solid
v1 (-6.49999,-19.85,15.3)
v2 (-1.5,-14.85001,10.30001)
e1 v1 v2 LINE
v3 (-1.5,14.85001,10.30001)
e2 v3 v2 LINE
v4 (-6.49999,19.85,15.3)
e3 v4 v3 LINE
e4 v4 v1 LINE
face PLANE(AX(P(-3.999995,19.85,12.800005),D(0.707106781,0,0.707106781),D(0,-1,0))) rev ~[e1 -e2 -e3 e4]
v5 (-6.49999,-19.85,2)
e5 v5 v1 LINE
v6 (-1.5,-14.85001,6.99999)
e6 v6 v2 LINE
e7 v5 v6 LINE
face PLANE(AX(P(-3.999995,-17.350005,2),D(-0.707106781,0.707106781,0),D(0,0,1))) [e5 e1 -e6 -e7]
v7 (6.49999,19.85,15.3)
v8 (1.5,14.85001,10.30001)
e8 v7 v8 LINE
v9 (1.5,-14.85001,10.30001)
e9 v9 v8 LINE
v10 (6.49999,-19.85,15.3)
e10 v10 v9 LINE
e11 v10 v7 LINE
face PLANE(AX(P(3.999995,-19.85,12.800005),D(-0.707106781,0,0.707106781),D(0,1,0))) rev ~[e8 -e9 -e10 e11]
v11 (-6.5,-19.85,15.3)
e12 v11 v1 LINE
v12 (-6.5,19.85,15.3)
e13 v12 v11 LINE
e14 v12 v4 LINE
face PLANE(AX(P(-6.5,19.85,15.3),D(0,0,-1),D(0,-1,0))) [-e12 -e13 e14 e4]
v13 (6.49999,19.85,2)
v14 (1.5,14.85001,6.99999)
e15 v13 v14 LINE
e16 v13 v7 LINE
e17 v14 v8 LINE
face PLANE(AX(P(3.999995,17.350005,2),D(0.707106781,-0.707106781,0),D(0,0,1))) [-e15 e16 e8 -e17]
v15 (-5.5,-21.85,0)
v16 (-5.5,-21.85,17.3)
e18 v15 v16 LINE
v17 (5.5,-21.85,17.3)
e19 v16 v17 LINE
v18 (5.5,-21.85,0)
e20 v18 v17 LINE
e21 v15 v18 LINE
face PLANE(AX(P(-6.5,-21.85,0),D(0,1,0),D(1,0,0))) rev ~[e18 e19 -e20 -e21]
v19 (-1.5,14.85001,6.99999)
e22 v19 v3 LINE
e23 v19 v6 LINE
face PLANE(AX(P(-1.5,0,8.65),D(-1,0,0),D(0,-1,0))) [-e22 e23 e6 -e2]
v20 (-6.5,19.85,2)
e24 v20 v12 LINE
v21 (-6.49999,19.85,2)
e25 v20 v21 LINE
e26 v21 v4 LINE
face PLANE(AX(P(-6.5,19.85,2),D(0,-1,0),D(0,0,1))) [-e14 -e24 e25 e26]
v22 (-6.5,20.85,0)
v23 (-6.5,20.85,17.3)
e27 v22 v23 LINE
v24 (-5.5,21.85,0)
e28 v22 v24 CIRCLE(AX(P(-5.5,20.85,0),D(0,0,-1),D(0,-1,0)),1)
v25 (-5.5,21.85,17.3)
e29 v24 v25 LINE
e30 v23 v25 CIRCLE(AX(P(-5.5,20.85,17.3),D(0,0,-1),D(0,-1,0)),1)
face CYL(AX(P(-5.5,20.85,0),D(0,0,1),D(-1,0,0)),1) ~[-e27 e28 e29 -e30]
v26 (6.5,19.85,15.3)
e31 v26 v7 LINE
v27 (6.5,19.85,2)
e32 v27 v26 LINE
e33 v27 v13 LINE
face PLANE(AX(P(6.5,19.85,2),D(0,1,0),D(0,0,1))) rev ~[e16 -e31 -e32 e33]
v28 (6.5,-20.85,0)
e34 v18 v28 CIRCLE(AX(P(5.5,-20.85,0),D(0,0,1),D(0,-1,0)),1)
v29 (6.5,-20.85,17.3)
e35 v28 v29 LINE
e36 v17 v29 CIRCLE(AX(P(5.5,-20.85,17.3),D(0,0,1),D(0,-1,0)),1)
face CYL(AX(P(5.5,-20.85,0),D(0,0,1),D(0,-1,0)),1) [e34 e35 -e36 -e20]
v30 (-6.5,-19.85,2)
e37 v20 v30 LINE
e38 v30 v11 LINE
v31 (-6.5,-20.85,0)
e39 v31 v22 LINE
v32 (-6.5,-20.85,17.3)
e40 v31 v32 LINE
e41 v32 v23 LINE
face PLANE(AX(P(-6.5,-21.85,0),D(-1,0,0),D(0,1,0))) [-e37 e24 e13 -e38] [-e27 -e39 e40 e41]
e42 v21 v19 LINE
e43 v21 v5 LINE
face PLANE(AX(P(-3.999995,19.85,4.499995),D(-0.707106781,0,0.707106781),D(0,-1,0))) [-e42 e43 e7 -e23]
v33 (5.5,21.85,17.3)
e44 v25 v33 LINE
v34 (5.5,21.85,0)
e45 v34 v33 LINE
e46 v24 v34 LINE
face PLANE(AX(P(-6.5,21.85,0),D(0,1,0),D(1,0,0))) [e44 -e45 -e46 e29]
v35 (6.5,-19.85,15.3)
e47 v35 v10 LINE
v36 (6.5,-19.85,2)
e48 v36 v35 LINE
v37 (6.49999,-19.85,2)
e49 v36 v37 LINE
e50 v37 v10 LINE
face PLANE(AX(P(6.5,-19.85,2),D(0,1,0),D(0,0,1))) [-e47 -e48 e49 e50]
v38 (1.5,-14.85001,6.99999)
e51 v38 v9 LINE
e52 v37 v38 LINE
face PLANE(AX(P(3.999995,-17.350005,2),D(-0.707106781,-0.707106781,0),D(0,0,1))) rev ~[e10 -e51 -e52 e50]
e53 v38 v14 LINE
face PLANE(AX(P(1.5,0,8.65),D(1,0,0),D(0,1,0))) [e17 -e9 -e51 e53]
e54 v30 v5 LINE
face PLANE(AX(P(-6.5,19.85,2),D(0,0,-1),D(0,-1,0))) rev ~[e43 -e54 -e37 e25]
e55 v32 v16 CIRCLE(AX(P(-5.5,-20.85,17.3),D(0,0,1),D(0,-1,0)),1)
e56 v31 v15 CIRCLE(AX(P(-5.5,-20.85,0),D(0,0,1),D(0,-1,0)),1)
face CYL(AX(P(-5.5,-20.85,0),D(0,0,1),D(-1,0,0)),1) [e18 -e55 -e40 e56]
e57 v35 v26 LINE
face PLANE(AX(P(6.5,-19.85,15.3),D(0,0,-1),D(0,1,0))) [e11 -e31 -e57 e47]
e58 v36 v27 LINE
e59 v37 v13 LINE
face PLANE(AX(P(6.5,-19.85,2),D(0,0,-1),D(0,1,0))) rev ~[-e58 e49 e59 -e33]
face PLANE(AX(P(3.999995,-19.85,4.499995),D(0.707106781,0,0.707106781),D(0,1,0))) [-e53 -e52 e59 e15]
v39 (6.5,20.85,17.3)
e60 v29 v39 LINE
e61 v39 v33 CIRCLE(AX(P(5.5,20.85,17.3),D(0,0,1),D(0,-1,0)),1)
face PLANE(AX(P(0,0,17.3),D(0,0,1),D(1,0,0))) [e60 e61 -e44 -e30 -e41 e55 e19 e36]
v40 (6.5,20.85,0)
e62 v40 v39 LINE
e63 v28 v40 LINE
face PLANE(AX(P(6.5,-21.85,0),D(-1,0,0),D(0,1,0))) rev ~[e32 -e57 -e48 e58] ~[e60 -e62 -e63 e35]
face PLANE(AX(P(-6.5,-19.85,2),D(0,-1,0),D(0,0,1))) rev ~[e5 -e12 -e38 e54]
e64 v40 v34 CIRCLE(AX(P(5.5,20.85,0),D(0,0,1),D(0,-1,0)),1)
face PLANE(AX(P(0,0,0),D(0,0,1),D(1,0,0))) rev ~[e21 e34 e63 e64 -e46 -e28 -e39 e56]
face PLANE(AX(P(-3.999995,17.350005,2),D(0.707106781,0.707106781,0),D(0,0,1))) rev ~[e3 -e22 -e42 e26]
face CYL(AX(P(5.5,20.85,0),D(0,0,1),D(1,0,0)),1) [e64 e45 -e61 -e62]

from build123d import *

# Parameters (mm, degrees)
F0_W     = 13
F0_H     = 43.7
F1_DEPTH = 17.3
F2_R     = 1
F3_W     = 39.7
F3_H     = 13.3
F5_DEPTH = 5
F4_W     = 39.7
F4_H     = 13.3
F6_DEPTH = 5
F7_SIZE  = 4.99999


# Not quite as in the source:
# - a fillet or chamfer is up to 0.001 mm smaller than in the source, because OpenCascade refuses the exact size


with BuildPart() as f1:
    # F0 (on Top) → F1 (new body)
    with BuildSketch(Plane.XY):
        Rectangle(F0_W, F0_H)
    extrude(amount=F1_DEPTH)

    # F2
    f2_edges = [f1.edges().sort_by_distance(p)[0] for p in [
        (-6.5, 21.85, 8.65),
        (6.5, 21.85, 8.65),
        (-6.5, -21.85, 8.65),
        (6.5, -21.85, 8.65),
    ]]
    fillet(f2_edges, radius=F2_R)

    # F3 (on face) → F5 (cut)
    with BuildSketch(Plane.YZ.offset(6.5)):
        with Locations((0, 8.65)):
            Rectangle(F3_W, F3_H)
    extrude(amount=-F5_DEPTH, mode=Mode.SUBTRACT)

    # F4 (on face) → F6 (cut)
    with BuildSketch(Plane(origin=(-6.5, 0, 0), x_dir=(0, -1, 0), z_dir=(-1, 0, 0))):
        with Locations((0, 8.65)):
            Rectangle(F4_W, F4_H)
    extrude(amount=-F6_DEPTH, mode=Mode.SUBTRACT)

    # F7 (size 5 in the source; OpenCascade refuses exactly that, so slightly less here)
    f7_edges = [f1.edges().sort_by_distance(p)[0] for p in [
        (-1.5, 0, 2),
        (-1.5, 19.85, 8.65),
        (-1.5, 0, 15.3),
        (-1.5, -19.85, 8.65),
        (1.5, 19.85, 8.65),
        (1.5, 0, 2),
        (1.5, -19.85, 8.65),
        (1.5, 0, 15.3),
    ]]
    chamfer(f7_edges, length=F7_SIZE)


solid = f1.part
